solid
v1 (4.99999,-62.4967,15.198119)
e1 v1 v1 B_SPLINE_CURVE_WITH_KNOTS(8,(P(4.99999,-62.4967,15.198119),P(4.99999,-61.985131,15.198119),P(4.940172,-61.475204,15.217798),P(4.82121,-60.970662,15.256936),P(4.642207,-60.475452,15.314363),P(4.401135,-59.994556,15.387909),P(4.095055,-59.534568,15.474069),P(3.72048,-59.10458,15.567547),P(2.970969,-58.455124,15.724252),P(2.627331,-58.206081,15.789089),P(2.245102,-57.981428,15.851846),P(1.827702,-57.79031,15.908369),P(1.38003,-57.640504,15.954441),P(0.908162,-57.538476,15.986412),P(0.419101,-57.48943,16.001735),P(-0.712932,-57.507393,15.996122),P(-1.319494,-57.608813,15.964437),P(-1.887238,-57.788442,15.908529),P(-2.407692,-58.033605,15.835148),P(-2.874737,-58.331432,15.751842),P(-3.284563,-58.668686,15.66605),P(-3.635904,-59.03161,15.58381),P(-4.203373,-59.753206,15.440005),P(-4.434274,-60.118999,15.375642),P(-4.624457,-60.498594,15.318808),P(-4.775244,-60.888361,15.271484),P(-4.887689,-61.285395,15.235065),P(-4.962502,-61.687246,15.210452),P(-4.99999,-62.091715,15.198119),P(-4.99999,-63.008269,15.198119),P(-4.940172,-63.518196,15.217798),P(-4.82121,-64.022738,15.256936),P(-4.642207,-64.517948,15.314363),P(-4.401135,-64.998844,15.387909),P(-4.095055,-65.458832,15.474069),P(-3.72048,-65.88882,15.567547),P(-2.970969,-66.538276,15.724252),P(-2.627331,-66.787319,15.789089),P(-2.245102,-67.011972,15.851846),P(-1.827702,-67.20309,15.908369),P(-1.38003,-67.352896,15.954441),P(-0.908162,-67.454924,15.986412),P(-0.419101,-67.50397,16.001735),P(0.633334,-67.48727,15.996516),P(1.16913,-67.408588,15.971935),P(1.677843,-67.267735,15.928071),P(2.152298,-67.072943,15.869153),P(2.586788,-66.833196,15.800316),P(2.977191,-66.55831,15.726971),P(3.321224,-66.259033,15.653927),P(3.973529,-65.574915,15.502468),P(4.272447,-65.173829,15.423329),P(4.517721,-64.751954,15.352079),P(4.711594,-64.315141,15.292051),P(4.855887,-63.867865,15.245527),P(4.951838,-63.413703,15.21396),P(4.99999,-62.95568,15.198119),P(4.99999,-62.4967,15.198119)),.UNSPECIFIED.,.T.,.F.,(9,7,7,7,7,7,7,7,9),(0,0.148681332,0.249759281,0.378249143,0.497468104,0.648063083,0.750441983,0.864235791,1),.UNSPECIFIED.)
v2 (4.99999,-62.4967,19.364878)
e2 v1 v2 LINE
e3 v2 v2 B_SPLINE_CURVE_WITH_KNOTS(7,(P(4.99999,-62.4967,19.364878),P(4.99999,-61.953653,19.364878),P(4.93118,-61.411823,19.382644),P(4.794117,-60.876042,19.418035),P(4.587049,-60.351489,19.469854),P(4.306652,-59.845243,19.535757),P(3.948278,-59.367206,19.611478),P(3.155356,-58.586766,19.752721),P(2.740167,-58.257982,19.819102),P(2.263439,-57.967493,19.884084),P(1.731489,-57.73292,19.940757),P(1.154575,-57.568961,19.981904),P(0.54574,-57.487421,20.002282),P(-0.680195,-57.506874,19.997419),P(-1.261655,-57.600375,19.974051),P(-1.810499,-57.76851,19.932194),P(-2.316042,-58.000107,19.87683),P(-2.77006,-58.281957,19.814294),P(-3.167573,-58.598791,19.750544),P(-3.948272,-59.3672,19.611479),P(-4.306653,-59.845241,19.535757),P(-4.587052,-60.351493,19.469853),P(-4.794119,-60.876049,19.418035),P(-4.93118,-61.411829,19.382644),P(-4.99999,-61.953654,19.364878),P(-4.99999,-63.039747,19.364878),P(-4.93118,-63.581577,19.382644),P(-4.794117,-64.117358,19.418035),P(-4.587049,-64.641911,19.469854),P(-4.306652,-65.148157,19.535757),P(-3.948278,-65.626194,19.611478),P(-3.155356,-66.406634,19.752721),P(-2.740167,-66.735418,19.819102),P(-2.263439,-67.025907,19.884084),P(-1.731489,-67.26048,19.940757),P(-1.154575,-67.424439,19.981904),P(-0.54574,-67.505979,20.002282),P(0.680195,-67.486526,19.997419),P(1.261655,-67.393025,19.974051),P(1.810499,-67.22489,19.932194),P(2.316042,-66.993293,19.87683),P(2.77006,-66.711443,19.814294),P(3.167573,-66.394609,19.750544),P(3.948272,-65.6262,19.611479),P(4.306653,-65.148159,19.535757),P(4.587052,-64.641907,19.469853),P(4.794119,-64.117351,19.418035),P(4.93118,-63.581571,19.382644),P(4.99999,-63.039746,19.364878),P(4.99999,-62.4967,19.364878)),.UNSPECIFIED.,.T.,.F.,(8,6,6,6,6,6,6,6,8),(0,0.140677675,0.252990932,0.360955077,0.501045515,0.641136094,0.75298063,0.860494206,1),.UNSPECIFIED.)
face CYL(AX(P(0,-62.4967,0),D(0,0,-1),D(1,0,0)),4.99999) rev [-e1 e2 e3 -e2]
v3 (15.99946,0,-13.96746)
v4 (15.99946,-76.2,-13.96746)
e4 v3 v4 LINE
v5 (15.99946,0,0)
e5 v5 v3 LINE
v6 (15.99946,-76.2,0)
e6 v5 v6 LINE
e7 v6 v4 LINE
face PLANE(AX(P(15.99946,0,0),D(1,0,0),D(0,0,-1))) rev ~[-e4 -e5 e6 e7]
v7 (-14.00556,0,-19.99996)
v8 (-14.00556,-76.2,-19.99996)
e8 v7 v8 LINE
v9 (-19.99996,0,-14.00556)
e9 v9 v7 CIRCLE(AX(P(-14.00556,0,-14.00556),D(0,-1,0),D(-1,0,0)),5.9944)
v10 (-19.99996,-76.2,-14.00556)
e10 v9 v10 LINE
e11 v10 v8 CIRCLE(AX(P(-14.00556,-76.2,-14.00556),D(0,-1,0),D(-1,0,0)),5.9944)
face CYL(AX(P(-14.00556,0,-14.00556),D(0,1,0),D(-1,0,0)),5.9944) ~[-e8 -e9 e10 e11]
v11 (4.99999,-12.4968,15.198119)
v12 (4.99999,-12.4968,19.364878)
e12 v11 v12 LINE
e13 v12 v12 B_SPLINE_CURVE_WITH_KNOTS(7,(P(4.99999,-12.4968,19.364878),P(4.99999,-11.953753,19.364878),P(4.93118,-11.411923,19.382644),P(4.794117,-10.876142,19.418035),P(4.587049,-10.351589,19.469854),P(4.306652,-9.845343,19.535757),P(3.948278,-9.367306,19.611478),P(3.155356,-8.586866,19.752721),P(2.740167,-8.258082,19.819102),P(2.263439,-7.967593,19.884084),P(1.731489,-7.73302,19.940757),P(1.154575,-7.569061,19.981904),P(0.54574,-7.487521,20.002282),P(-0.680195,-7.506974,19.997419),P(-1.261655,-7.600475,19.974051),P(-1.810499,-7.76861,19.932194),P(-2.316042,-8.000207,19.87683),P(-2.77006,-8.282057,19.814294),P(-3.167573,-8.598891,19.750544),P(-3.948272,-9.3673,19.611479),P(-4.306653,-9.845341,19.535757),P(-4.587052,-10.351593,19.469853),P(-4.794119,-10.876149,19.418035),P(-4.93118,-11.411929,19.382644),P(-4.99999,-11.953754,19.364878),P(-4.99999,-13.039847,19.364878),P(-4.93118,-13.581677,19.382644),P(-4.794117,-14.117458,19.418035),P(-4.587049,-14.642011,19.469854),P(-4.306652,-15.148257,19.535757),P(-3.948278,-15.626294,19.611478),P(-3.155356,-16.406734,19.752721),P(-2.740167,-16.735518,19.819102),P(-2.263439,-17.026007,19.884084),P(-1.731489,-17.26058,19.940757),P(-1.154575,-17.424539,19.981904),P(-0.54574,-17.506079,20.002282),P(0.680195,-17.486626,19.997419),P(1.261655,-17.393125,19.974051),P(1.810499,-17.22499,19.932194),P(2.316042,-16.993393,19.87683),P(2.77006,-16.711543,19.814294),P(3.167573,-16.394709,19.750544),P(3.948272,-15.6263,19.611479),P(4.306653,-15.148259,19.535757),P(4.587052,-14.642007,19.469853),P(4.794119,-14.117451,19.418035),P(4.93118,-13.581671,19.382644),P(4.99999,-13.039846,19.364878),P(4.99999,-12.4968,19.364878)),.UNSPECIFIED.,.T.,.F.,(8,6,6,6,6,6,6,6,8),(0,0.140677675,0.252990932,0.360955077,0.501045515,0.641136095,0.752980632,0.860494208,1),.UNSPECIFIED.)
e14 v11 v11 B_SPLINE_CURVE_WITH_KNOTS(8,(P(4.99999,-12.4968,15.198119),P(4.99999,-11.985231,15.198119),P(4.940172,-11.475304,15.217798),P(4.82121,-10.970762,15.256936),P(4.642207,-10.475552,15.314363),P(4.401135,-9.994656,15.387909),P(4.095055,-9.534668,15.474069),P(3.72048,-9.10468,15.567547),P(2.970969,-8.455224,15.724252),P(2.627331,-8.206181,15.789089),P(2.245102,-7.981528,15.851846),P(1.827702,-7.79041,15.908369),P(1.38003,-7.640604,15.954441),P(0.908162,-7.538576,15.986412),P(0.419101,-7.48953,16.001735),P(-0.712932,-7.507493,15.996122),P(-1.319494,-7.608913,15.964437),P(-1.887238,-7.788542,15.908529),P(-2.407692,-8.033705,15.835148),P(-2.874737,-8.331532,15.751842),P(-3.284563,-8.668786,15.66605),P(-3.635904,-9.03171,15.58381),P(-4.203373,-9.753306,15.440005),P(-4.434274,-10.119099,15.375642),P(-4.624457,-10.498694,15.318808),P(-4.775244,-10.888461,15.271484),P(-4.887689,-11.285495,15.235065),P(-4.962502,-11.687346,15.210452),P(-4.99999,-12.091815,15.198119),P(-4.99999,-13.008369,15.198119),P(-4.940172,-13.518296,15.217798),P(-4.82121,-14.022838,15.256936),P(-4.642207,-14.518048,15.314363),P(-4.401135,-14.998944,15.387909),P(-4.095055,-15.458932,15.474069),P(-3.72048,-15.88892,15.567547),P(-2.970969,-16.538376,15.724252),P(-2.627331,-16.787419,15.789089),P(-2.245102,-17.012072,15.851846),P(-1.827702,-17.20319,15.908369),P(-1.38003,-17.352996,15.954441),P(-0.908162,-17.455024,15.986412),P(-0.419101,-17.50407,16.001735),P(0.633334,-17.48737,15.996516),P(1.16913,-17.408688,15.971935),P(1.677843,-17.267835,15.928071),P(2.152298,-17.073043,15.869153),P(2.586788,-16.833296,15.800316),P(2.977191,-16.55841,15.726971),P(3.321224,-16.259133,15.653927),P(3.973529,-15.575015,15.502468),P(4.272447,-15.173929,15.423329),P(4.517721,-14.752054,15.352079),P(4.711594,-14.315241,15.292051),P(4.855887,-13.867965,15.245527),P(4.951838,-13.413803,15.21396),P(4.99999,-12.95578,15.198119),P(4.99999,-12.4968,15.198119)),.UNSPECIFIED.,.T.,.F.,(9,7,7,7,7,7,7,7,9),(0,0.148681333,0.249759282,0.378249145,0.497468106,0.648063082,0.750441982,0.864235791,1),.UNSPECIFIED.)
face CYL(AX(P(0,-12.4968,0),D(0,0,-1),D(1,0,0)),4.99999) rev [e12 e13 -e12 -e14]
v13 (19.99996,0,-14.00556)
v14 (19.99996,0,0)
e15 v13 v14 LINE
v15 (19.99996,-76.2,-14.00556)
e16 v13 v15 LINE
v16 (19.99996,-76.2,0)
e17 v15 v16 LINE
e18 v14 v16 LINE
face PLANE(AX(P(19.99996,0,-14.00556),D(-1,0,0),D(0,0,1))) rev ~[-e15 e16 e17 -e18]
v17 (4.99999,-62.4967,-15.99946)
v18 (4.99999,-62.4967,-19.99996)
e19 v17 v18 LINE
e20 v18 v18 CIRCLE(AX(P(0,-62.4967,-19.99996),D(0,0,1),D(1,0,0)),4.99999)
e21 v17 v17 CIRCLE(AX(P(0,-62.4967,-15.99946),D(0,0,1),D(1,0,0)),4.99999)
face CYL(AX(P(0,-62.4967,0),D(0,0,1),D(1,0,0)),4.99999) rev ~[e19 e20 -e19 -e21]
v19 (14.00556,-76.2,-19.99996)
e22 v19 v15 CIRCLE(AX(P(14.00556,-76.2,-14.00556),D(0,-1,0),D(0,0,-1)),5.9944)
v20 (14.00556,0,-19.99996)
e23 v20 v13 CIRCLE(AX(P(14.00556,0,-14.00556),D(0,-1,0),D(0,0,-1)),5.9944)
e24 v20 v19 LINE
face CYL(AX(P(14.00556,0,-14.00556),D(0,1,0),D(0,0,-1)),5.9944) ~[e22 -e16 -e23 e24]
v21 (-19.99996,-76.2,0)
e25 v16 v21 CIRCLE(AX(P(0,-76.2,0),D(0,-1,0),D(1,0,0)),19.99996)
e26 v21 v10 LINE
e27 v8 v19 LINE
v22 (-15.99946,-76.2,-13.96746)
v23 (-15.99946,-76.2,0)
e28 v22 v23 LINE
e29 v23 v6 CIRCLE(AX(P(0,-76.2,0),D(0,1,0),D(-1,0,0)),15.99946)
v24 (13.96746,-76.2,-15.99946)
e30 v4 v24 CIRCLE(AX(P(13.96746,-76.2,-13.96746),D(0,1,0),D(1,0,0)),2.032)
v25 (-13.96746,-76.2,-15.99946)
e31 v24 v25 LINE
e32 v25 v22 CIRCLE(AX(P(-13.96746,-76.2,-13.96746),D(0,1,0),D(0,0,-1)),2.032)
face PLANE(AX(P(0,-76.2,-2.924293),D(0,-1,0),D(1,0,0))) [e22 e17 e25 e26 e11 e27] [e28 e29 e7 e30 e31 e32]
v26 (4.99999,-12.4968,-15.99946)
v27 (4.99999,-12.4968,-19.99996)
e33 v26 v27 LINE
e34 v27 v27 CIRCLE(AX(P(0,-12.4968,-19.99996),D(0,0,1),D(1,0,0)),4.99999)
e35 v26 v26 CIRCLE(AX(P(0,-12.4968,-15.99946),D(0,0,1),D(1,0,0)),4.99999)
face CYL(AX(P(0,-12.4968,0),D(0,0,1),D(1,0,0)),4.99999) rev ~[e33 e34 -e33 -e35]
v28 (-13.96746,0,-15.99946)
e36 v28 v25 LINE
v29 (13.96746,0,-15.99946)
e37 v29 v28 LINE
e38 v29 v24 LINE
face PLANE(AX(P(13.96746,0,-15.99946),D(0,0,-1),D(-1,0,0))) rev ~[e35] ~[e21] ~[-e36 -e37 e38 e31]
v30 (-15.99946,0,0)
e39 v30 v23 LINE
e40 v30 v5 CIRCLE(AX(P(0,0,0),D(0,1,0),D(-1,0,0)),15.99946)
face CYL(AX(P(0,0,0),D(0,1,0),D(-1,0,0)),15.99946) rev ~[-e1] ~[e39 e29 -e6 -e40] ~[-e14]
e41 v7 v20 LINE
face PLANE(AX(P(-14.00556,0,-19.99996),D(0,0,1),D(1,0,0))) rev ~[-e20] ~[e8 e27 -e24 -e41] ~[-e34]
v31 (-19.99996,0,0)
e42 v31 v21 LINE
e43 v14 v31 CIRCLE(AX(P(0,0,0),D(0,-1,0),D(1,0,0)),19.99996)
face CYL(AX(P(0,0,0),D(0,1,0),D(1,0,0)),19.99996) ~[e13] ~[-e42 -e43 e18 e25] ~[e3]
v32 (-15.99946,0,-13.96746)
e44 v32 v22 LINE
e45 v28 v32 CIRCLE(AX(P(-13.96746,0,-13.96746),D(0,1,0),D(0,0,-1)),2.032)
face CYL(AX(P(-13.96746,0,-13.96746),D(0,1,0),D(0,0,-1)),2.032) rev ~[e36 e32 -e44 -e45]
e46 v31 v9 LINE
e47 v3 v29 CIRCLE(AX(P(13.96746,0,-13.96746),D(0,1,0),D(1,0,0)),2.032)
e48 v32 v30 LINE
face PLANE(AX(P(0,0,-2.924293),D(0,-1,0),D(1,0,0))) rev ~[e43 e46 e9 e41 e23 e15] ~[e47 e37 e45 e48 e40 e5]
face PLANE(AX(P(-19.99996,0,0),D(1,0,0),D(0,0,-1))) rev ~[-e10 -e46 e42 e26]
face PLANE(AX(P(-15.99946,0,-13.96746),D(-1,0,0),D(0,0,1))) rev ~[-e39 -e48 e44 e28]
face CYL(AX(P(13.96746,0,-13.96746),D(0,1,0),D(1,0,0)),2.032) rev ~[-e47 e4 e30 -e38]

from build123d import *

# Parameters (mm, degrees)
F1_DEPTH      = 76.2
F2_R          = 4.99999
F3_DEPTH      = 20.00096
F3_DEPTH_BACK = 25.4


with BuildPart() as f1:
    # F0 (on Front) → F1 (new body)
    with BuildSketch(Plane.XZ):
        with BuildLine():
            ThreePointArc((19.99996, 0), (0, 19.99996), (-19.99996, 0))
            Line((-19.99996, 0), (-19.99996, -14.00556))
            ThreePointArc((-19.99996, -14.00556), (-18.2442408891, -18.2442408891), (-14.00556, -19.99996))
            Line((-14.00556, -19.99996), (14.00556, -19.99996))
            ThreePointArc((14.00556, -19.99996), (18.2442408891, -18.2442408891), (19.99996, -14.00556))
            Line((19.99996, -14.00556), (19.99996, 0))
        make_face()
        with BuildLine():
            Line((-15.99946, -13.96746), (-15.99946, 0))
            ThreePointArc((-15.99946, 0), (0, 15.99946), (15.99946, 0))
            Line((15.99946, 0), (15.99946, -13.96746))
            ThreePointArc((15.99946, -13.96746), (15.4043009794, -15.4043009794), (13.96746, -15.99946))
            Line((13.96746, -15.99946), (-13.96746, -15.99946))
            ThreePointArc((-13.96746, -15.99946), (-15.4043009794, -15.4043009794), (-15.99946, -13.96746))
        make_face(mode=Mode.SUBTRACT)
    extrude(amount=F1_DEPTH)

    # F2 (on Top) → F3 (cut, two sides)
    with BuildSketch(Plane.XY) as f3_sk:
        with Locations((0, -62.4967)):
            Circle(F2_R)
        with Locations((0, -12.4968)):
            Circle(F2_R)
    extrude(amount=-F3_DEPTH, mode=Mode.SUBTRACT)
    extrude(f3_sk.sketch, amount=F3_DEPTH_BACK, mode=Mode.SUBTRACT)


solid = f1.part
